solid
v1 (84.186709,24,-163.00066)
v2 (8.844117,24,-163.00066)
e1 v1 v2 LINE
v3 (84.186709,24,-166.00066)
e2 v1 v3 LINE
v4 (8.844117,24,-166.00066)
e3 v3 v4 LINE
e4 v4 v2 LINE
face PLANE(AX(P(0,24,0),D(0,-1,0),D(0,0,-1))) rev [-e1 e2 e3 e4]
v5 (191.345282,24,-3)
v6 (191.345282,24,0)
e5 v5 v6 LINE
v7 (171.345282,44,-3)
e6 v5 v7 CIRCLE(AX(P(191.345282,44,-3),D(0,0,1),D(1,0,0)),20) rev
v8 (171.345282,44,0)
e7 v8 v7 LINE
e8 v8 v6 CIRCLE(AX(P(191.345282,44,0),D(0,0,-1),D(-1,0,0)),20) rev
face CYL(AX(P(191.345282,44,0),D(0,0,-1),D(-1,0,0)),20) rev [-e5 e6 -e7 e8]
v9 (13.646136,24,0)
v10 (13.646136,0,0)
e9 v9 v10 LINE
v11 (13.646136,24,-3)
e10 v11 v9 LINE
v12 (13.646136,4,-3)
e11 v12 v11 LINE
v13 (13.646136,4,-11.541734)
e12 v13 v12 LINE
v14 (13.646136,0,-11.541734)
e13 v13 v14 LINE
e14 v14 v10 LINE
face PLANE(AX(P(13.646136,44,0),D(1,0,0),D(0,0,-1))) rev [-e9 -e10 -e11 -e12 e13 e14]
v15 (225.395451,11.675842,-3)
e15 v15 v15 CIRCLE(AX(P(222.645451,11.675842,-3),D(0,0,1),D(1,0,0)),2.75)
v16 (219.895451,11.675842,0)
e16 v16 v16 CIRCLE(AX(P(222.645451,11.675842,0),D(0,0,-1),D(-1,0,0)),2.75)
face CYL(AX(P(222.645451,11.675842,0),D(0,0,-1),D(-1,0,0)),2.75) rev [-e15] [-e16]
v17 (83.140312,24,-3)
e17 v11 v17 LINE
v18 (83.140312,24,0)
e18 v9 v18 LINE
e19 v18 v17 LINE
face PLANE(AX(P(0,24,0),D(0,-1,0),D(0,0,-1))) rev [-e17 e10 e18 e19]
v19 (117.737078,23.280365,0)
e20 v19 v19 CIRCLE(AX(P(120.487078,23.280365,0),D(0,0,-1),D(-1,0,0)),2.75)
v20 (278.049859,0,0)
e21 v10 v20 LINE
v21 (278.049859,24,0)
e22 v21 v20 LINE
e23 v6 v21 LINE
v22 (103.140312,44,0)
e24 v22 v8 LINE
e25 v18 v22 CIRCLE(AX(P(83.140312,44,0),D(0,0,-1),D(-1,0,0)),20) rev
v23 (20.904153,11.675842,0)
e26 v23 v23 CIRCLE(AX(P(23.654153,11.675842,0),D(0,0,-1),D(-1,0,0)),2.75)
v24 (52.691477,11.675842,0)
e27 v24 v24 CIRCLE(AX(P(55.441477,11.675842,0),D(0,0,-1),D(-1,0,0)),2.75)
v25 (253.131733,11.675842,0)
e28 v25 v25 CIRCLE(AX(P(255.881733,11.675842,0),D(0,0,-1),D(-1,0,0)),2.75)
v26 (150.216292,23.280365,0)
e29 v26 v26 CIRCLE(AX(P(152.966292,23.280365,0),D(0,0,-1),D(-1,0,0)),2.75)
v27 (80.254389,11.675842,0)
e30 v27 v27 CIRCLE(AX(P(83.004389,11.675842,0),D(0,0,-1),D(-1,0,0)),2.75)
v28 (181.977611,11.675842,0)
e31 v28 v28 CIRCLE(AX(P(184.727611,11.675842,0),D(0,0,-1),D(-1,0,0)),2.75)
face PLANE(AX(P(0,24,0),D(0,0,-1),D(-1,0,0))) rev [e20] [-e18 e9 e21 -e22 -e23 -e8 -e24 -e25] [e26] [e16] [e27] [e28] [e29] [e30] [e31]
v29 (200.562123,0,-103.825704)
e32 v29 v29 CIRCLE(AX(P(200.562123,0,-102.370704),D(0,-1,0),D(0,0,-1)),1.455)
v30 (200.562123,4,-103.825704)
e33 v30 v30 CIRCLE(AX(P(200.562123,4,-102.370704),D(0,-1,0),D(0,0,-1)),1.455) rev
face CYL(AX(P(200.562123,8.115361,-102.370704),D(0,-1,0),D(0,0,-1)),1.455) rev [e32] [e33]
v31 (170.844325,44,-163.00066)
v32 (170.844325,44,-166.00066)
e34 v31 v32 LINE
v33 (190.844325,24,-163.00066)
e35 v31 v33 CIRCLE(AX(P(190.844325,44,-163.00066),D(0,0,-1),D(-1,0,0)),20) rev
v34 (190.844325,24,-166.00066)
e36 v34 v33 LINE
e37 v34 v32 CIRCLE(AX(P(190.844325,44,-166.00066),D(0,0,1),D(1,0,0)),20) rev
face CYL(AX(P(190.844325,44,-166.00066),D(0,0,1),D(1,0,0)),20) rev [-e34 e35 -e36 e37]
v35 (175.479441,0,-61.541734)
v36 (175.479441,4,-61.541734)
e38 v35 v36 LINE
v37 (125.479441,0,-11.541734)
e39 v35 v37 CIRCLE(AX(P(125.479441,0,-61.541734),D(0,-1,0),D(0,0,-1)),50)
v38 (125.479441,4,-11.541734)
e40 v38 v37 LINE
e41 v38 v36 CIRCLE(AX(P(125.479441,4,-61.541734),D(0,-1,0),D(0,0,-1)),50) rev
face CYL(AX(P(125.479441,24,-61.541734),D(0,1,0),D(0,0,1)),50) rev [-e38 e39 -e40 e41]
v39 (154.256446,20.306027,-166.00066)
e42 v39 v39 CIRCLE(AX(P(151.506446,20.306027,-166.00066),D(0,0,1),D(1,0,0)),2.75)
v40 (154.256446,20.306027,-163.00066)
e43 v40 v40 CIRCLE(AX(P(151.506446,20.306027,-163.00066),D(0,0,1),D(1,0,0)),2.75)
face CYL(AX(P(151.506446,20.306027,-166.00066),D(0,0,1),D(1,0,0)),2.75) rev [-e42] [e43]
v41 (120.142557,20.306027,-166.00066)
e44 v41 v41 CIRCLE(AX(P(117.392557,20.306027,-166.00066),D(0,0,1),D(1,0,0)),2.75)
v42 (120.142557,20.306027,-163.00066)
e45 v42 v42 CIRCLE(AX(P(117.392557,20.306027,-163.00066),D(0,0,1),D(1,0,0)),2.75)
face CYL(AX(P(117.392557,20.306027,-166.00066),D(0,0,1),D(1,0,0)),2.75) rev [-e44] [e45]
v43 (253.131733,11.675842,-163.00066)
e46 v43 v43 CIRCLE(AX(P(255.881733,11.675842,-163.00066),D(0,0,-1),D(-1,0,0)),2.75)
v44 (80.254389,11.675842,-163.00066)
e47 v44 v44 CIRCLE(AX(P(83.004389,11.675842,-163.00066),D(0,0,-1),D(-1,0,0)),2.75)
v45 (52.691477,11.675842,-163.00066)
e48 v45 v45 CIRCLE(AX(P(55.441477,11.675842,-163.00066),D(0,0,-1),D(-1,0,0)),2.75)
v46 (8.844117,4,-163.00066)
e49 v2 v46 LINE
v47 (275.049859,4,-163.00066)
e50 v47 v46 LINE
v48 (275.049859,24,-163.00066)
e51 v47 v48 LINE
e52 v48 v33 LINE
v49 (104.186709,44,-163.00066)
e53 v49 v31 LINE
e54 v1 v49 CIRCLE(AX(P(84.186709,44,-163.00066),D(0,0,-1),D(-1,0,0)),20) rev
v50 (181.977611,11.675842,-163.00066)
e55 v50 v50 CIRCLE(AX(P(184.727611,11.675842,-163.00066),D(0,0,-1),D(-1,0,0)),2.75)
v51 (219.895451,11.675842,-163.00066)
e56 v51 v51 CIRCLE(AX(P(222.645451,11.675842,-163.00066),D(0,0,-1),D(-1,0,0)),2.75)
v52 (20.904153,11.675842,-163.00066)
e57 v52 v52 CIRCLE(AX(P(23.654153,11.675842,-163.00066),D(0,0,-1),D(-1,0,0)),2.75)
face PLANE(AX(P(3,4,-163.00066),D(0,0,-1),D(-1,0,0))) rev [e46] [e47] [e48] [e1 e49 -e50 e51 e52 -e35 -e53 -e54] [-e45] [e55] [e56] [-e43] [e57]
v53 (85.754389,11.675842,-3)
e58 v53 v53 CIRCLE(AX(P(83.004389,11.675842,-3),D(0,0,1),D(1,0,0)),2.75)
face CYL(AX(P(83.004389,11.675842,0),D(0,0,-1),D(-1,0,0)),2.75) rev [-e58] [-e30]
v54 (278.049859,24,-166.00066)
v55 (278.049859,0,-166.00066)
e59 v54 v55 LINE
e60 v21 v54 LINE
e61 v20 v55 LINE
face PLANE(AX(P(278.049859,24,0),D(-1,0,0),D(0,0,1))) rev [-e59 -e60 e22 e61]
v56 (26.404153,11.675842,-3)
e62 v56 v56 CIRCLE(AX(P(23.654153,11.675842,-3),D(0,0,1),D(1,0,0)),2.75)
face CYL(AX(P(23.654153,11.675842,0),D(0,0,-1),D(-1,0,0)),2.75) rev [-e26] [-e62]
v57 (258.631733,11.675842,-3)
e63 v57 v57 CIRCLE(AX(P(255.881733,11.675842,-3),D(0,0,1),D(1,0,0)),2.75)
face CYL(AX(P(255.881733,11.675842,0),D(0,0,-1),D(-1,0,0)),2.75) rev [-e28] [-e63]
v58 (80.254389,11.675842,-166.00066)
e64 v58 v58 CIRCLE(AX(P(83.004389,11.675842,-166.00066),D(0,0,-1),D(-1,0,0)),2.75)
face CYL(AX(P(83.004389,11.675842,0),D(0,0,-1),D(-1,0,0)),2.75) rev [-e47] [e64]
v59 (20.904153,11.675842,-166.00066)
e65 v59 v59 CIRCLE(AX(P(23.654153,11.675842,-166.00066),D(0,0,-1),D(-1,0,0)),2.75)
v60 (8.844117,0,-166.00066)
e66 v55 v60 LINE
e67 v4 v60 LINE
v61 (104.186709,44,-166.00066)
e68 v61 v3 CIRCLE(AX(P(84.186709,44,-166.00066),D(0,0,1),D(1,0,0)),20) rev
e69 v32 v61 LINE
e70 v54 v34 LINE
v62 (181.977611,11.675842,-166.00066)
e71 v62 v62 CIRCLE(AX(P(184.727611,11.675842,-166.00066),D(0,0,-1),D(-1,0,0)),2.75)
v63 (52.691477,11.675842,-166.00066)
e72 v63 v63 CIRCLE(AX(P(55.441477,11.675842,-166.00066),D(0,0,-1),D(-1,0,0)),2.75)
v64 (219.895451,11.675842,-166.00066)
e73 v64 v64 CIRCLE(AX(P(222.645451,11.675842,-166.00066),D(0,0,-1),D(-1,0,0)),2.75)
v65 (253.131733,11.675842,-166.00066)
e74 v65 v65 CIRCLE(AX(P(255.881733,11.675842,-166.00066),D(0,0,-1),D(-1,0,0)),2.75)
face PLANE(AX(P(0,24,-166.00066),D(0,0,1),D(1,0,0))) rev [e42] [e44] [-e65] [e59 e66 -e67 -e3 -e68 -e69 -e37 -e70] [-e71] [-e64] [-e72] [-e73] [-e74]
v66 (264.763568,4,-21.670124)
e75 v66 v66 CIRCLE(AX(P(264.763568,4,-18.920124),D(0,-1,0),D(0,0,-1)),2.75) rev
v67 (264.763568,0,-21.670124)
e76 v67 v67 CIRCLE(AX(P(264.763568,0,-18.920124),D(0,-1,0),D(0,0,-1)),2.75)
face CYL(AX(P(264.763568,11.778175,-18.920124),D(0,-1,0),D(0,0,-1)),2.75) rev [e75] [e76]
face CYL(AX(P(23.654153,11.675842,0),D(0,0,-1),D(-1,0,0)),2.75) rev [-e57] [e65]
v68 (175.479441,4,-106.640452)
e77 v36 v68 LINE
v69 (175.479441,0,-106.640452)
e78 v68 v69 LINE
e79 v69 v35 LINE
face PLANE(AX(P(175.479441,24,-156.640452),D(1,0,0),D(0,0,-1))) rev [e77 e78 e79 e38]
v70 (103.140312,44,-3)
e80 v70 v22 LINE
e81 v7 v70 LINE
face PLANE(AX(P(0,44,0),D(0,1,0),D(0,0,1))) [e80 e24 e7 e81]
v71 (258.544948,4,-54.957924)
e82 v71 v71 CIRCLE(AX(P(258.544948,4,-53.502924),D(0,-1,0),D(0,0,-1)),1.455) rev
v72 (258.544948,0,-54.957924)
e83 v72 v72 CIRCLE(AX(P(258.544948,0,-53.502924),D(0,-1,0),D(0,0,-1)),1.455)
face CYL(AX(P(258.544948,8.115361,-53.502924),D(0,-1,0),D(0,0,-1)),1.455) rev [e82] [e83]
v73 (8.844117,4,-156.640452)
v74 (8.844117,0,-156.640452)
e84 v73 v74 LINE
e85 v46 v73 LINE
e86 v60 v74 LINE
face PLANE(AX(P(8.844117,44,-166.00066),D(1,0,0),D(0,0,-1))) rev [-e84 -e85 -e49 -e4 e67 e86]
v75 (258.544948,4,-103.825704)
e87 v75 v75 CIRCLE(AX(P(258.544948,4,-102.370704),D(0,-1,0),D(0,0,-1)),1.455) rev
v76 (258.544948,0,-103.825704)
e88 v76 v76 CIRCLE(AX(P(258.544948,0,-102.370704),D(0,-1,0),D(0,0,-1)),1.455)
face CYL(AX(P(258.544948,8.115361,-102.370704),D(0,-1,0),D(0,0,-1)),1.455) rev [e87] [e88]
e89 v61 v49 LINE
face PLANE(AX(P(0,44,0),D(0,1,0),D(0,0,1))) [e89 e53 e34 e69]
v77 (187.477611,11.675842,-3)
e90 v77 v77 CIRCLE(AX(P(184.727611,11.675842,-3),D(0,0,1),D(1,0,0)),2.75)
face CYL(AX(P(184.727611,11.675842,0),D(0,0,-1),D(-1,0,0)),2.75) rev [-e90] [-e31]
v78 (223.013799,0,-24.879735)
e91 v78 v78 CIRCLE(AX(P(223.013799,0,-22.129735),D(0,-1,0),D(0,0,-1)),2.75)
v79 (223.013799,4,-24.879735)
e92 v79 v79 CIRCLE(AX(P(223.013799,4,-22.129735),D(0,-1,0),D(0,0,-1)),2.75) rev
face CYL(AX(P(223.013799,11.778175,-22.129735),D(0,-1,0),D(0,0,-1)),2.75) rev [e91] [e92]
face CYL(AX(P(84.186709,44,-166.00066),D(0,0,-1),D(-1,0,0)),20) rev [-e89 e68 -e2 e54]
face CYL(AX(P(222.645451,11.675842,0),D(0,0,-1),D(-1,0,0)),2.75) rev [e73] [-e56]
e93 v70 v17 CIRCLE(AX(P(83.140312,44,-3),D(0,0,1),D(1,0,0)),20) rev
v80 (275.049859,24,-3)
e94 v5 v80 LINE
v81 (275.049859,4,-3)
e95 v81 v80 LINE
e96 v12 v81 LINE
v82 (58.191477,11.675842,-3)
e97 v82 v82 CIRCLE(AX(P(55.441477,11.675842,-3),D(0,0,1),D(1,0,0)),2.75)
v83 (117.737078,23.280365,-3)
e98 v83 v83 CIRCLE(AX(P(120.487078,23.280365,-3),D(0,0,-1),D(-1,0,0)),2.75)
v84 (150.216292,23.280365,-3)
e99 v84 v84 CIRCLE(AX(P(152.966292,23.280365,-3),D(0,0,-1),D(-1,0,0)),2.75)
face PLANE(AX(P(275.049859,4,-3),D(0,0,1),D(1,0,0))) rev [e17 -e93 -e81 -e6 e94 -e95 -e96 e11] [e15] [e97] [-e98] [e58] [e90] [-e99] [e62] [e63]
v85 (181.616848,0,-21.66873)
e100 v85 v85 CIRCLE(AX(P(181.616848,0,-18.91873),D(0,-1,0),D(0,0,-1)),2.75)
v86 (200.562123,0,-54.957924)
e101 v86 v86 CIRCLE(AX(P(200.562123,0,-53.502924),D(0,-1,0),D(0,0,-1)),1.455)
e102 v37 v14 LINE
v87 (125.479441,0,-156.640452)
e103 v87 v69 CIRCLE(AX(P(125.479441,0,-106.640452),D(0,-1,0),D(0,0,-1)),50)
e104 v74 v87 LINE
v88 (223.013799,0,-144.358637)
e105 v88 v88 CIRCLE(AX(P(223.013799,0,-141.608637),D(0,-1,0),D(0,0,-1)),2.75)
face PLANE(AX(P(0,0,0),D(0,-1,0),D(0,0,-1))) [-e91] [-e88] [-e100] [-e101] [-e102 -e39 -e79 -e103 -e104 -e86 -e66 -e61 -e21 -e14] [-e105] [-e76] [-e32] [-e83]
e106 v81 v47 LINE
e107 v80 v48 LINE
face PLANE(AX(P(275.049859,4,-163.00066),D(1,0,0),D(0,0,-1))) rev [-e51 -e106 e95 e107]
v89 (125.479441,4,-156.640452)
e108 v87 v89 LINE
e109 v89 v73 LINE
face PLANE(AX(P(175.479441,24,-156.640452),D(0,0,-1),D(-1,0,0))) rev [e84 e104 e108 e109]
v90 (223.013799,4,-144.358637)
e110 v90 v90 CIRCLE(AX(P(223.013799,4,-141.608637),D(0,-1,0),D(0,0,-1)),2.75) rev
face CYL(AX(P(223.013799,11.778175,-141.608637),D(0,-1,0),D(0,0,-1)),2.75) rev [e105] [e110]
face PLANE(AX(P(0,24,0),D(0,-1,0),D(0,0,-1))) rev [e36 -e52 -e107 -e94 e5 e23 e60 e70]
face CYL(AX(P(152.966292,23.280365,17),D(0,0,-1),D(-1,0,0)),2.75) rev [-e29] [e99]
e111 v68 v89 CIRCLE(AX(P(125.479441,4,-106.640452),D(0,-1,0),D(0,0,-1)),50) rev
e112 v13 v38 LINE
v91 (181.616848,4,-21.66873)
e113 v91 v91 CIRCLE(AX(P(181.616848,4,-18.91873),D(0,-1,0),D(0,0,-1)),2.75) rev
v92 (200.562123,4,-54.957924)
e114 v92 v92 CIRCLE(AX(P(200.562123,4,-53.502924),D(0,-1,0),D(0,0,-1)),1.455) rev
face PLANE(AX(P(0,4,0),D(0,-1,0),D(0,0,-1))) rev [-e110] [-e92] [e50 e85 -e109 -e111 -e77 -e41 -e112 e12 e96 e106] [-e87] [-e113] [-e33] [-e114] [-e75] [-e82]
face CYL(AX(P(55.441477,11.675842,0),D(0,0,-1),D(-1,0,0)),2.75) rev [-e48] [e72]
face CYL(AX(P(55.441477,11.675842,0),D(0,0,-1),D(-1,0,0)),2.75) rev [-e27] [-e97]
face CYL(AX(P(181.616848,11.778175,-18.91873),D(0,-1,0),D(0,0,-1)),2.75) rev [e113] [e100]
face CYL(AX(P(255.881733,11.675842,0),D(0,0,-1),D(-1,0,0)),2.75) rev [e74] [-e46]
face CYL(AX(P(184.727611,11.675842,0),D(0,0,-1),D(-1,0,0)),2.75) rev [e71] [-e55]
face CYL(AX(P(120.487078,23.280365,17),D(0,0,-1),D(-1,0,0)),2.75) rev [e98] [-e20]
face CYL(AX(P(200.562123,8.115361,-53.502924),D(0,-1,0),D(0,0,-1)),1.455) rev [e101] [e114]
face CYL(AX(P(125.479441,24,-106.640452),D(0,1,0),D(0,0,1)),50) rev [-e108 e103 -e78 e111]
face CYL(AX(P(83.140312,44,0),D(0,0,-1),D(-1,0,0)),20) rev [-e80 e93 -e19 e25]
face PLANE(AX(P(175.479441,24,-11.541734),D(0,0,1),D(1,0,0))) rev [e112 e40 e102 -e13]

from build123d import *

# Parameters (mm, degrees)
SKETCH1_W              = 278.049859422
SKETCH1_H              = 166.000659628
BOSS_EXTRUDE1_DEPTH    = 24
SKETCH2_W              = 189.719631187
SKETCH2_H              = 145.09871859
CUT_EXTRUDE1_DEPTH     = 325.721331793
SKETCH3_W              = 272.049859422
SKETCH3_H              = 160.000659628
CUT_EXTRUDE2_DEPTH     = 20
FILLET1_R              = 50
FILLET2_R              = 50
SKETCH4_W              = 68.204970116
SKETCH4_H              = 3
BOSS_EXTRUDE2_DEPTH    = 20
FILLET4_R              = 20
FILLET5_R              = 20
SKETCH5_W              = 66.657615254
SKETCH5_H              = 3
BOSS_EXTRUDE3_DEPTH    = 20
FILLET6_R              = 20
FILLET7_R              = 20
SKETCH6_R              = 2.75
HOLESFORBOLTS1_DEPTH   = 326.295157302
SKETCH7_R              = 2.75
CUT_EXTRUDE4_DEPTH     = 327.808725896
SKETCH8_R              = 2.75
CUT_EXTRUDE5_DEPTH     = 20
SKETCH11_W             = 13.646136269
SKETCH11_H             = 11.541733762
CUT_EXTRUDE6_DEPTH     = 327.808725896
SKETCH12_W             = 8.844116654
SKETCH12_H             = 9.360207276
CUT_EXTRUDE7_DEPTH     = 327.808725896
HOLESINLIDFORPICOVER_R = 2.75
CUT_EXTRUDE8_DEPTH     = 107.252842694
LIDHOLESFORPI_R        = 1.455
CUT_EXTRUDE9_DEPTH     = 4
SKETCH14_R             = 2.75
CUT_EXTRUDE10_DEPTH    = 4


with BuildPart() as part:
    # Sketch1 → Boss-Extrude1 (new body)
    with BuildSketch(Plane(origin=(0, 0, 0), x_dir=(1, 0, 0), z_dir=(0, 1, 0))):
        with Locations((139.024929711, 83.000329814)):
            Rectangle(SKETCH1_W, SKETCH1_H)
    extrude(amount=BOSS_EXTRUDE1_DEPTH)

    # Sketch2 → Cut-Extrude1 (cut, through all)
    with BuildSketch(Plane(origin=(0, 0, 0), x_dir=(-1, 0, 0), z_dir=(0, -1, 0))):
        with Locations((-80.61962524, 84.091093057)):
            Rectangle(SKETCH2_W, SKETCH2_H)
    extrude(amount=-CUT_EXTRUDE1_DEPTH, mode=Mode.SUBTRACT)

    # Sketch3 → Cut-Extrude2 (cut)
    with BuildSketch(Plane(origin=(0, 24, 0), x_dir=(1, 0, 0), z_dir=(0, 1, 0))):
        with Locations((139.024929711, 83.000329814)):
            Rectangle(SKETCH3_W, SKETCH3_H)
    extrude(amount=-CUT_EXTRUDE2_DEPTH, mode=Mode.SUBTRACT)

    # Fillet1
    fillet1_edges = [part.edges().sort_by_distance(p)[0] for p in [
        (175.479440834, 2, -11.541733762),
    ]]
    fillet(fillet1_edges, radius=FILLET1_R)

    # Fillet2
    fillet2_edges = [part.edges().sort_by_distance(p)[0] for p in [
        (175.479440834, 2, -156.640452352),
    ]]
    fillet(fillet2_edges, radius=FILLET2_R)

    # Sketch4 → Boss-Extrude2 (add)
    with BuildSketch(Plane(origin=(0, 24, 0), x_dir=(1, 0, 0), z_dir=(0, 1, 0))):
        with Locations((137.24279725, 1.5)):
            Rectangle(SKETCH4_W, SKETCH4_H)
    extrude(amount=BOSS_EXTRUDE2_DEPTH)

    # Fillet4
    fillet4_edges = [part.edges().sort_by_distance(p)[0] for p in [
        (103.140312192, 24, -1.5),
    ]]
    fillet(fillet4_edges, radius=FILLET4_R - 0.0001)  # a hair under: the kernel refuses the full size

    # Fillet5
    fillet5_edges = [part.edges().sort_by_distance(p)[0] for p in [
        (171.345282308, 24, -1.5),
    ]]
    fillet(fillet5_edges, radius=FILLET5_R - 0.0001)  # a hair under: the kernel refuses the full size

    # Sketch5 → Boss-Extrude3 (add)
    with BuildSketch(Plane(origin=(0, 24, 0), x_dir=(1, 0, 0), z_dir=(0, 1, 0))):
        with Locations((137.51551703, 164.500659628)):
            Rectangle(SKETCH5_W, SKETCH5_H)
    extrude(amount=BOSS_EXTRUDE3_DEPTH)

    # Fillet6
    fillet6_edges = [part.edges().sort_by_distance(p)[0] for p in [
        (104.186709403, 24, -164.500659628),
    ]]
    fillet(fillet6_edges, radius=FILLET6_R - 0.0001)  # a hair under: the kernel refuses the full size

    # Fillet7
    fillet7_edges = [part.edges().sort_by_distance(p)[0] for p in [
        (170.844324657, 24, -164.500659628),
    ]]
    fillet(fillet7_edges, radius=FILLET7_R - 0.0001)  # a hair under: the kernel refuses the full size

    # Sketch6 → HolesForBolts1 (cut, through all)
    with BuildSketch(Plane.XY.offset(-163.000659628)):
        with Locations((151.506445743, 20.306027196)):
            Circle(SKETCH6_R)
        with Locations((117.392557181, 20.306027196)):
            Circle(SKETCH6_R)
    extrude(amount=-HOLESFORBOLTS1_DEPTH, mode=Mode.SUBTRACT)

    # Sketch7 → Cut-Extrude4 (cut, through all)
    with BuildSketch(Plane(origin=(0, 0, -166.000659628), x_dir=(-1, 0, 0), z_dir=(0, 0, -1))):
        with Locations((-23.654153003, 11.675842417)):
            Circle(SKETCH7_R)
        with Locations((-55.441477074, 11.675842417)):
            Circle(SKETCH7_R)
        with Locations((-83.004388954, 11.675842417)):
            Circle(SKETCH7_R)
        with Locations((-184.727610529, 11.675842417)):
            Circle(SKETCH7_R)
        with Locations((-222.645451091, 11.675842417)):
            Circle(SKETCH7_R)
        with Locations((-255.881733076, 11.675842417)):
            Circle(SKETCH7_R)
    extrude(amount=-CUT_EXTRUDE4_DEPTH, mode=Mode.SUBTRACT)

    # Sketch8 → Cut-Extrude5 (cut)
    with BuildSketch(Plane(origin=(0, 0, -3), x_dir=(-1, 0, 0), z_dir=(0, 0, -1))):
        with Locations((-120.487078085, 23.280365191)):
            Circle(SKETCH8_R)
        with Locations((-152.966291723, 23.280365191)):
            Circle(SKETCH8_R)
    extrude(amount=-CUT_EXTRUDE5_DEPTH, mode=Mode.SUBTRACT)

    # Sketch11 → Cut-Extrude6 (cut, through all)
    with BuildSketch(Plane.XZ):
        with Locations((6.823068135, -5.770866881)):
            Rectangle(SKETCH11_W, SKETCH11_H)
    extrude(amount=-CUT_EXTRUDE6_DEPTH, mode=Mode.SUBTRACT)

    # Sketch12 → Cut-Extrude7 (cut, through all)
    with BuildSketch(Plane.XZ):
        with Locations((4.422058327, -161.32055599)):
            Rectangle(SKETCH12_W, SKETCH12_H)
    extrude(amount=-CUT_EXTRUDE7_DEPTH, mode=Mode.SUBTRACT)

    # HolesInLidForPiCover → Cut-Extrude8 (cut)
    with BuildSketch(Plane.XZ):
        with Locations(Location((223.013799051, -141.608636884, 0), (0, 0, 270))):
            Circle(HOLESINLIDFORPICOVER_R)
        with Locations(Location((223.013799051, -22.129735073, 0), (0, 0, 270))):
            Circle(HOLESINLIDFORPICOVER_R)
    extrude(amount=-CUT_EXTRUDE8_DEPTH, mode=Mode.SUBTRACT)

    # LidHolesForPi → Cut-Extrude9 (cut)
    with BuildSketch(Plane.XZ):
        with Locations(Location((200.562123112, -102.370703816, 0), (0, 0, 270))):
            Circle(LIDHOLESFORPI_R)
        with Locations(Location((200.562123112, -53.502923562, 0), (0, 0, 270))):
            Circle(LIDHOLESFORPI_R)
        with Locations(Location((258.544947711, -53.502923562, 0), (0, 0, 270))):
            Circle(LIDHOLESFORPI_R)
        with Locations(Location((258.544947711, -102.370703816, 0), (0, 0, 270))):
            Circle(LIDHOLESFORPI_R)
    extrude(amount=-CUT_EXTRUDE9_DEPTH, mode=Mode.SUBTRACT)

    # Sketch14 → Cut-Extrude10 (cut)
    with BuildSketch(Plane.XZ):
        with Locations(Location((264.763568483, -18.920123653, 0), (0, 0, 270))):
            Circle(SKETCH14_R)
        with Locations(Location((181.616848195, -18.918729826, 0), (0, 0, 270))):
            Circle(SKETCH14_R)
    extrude(amount=-CUT_EXTRUDE10_DEPTH, mode=Mode.SUBTRACT)


solid = part.part
